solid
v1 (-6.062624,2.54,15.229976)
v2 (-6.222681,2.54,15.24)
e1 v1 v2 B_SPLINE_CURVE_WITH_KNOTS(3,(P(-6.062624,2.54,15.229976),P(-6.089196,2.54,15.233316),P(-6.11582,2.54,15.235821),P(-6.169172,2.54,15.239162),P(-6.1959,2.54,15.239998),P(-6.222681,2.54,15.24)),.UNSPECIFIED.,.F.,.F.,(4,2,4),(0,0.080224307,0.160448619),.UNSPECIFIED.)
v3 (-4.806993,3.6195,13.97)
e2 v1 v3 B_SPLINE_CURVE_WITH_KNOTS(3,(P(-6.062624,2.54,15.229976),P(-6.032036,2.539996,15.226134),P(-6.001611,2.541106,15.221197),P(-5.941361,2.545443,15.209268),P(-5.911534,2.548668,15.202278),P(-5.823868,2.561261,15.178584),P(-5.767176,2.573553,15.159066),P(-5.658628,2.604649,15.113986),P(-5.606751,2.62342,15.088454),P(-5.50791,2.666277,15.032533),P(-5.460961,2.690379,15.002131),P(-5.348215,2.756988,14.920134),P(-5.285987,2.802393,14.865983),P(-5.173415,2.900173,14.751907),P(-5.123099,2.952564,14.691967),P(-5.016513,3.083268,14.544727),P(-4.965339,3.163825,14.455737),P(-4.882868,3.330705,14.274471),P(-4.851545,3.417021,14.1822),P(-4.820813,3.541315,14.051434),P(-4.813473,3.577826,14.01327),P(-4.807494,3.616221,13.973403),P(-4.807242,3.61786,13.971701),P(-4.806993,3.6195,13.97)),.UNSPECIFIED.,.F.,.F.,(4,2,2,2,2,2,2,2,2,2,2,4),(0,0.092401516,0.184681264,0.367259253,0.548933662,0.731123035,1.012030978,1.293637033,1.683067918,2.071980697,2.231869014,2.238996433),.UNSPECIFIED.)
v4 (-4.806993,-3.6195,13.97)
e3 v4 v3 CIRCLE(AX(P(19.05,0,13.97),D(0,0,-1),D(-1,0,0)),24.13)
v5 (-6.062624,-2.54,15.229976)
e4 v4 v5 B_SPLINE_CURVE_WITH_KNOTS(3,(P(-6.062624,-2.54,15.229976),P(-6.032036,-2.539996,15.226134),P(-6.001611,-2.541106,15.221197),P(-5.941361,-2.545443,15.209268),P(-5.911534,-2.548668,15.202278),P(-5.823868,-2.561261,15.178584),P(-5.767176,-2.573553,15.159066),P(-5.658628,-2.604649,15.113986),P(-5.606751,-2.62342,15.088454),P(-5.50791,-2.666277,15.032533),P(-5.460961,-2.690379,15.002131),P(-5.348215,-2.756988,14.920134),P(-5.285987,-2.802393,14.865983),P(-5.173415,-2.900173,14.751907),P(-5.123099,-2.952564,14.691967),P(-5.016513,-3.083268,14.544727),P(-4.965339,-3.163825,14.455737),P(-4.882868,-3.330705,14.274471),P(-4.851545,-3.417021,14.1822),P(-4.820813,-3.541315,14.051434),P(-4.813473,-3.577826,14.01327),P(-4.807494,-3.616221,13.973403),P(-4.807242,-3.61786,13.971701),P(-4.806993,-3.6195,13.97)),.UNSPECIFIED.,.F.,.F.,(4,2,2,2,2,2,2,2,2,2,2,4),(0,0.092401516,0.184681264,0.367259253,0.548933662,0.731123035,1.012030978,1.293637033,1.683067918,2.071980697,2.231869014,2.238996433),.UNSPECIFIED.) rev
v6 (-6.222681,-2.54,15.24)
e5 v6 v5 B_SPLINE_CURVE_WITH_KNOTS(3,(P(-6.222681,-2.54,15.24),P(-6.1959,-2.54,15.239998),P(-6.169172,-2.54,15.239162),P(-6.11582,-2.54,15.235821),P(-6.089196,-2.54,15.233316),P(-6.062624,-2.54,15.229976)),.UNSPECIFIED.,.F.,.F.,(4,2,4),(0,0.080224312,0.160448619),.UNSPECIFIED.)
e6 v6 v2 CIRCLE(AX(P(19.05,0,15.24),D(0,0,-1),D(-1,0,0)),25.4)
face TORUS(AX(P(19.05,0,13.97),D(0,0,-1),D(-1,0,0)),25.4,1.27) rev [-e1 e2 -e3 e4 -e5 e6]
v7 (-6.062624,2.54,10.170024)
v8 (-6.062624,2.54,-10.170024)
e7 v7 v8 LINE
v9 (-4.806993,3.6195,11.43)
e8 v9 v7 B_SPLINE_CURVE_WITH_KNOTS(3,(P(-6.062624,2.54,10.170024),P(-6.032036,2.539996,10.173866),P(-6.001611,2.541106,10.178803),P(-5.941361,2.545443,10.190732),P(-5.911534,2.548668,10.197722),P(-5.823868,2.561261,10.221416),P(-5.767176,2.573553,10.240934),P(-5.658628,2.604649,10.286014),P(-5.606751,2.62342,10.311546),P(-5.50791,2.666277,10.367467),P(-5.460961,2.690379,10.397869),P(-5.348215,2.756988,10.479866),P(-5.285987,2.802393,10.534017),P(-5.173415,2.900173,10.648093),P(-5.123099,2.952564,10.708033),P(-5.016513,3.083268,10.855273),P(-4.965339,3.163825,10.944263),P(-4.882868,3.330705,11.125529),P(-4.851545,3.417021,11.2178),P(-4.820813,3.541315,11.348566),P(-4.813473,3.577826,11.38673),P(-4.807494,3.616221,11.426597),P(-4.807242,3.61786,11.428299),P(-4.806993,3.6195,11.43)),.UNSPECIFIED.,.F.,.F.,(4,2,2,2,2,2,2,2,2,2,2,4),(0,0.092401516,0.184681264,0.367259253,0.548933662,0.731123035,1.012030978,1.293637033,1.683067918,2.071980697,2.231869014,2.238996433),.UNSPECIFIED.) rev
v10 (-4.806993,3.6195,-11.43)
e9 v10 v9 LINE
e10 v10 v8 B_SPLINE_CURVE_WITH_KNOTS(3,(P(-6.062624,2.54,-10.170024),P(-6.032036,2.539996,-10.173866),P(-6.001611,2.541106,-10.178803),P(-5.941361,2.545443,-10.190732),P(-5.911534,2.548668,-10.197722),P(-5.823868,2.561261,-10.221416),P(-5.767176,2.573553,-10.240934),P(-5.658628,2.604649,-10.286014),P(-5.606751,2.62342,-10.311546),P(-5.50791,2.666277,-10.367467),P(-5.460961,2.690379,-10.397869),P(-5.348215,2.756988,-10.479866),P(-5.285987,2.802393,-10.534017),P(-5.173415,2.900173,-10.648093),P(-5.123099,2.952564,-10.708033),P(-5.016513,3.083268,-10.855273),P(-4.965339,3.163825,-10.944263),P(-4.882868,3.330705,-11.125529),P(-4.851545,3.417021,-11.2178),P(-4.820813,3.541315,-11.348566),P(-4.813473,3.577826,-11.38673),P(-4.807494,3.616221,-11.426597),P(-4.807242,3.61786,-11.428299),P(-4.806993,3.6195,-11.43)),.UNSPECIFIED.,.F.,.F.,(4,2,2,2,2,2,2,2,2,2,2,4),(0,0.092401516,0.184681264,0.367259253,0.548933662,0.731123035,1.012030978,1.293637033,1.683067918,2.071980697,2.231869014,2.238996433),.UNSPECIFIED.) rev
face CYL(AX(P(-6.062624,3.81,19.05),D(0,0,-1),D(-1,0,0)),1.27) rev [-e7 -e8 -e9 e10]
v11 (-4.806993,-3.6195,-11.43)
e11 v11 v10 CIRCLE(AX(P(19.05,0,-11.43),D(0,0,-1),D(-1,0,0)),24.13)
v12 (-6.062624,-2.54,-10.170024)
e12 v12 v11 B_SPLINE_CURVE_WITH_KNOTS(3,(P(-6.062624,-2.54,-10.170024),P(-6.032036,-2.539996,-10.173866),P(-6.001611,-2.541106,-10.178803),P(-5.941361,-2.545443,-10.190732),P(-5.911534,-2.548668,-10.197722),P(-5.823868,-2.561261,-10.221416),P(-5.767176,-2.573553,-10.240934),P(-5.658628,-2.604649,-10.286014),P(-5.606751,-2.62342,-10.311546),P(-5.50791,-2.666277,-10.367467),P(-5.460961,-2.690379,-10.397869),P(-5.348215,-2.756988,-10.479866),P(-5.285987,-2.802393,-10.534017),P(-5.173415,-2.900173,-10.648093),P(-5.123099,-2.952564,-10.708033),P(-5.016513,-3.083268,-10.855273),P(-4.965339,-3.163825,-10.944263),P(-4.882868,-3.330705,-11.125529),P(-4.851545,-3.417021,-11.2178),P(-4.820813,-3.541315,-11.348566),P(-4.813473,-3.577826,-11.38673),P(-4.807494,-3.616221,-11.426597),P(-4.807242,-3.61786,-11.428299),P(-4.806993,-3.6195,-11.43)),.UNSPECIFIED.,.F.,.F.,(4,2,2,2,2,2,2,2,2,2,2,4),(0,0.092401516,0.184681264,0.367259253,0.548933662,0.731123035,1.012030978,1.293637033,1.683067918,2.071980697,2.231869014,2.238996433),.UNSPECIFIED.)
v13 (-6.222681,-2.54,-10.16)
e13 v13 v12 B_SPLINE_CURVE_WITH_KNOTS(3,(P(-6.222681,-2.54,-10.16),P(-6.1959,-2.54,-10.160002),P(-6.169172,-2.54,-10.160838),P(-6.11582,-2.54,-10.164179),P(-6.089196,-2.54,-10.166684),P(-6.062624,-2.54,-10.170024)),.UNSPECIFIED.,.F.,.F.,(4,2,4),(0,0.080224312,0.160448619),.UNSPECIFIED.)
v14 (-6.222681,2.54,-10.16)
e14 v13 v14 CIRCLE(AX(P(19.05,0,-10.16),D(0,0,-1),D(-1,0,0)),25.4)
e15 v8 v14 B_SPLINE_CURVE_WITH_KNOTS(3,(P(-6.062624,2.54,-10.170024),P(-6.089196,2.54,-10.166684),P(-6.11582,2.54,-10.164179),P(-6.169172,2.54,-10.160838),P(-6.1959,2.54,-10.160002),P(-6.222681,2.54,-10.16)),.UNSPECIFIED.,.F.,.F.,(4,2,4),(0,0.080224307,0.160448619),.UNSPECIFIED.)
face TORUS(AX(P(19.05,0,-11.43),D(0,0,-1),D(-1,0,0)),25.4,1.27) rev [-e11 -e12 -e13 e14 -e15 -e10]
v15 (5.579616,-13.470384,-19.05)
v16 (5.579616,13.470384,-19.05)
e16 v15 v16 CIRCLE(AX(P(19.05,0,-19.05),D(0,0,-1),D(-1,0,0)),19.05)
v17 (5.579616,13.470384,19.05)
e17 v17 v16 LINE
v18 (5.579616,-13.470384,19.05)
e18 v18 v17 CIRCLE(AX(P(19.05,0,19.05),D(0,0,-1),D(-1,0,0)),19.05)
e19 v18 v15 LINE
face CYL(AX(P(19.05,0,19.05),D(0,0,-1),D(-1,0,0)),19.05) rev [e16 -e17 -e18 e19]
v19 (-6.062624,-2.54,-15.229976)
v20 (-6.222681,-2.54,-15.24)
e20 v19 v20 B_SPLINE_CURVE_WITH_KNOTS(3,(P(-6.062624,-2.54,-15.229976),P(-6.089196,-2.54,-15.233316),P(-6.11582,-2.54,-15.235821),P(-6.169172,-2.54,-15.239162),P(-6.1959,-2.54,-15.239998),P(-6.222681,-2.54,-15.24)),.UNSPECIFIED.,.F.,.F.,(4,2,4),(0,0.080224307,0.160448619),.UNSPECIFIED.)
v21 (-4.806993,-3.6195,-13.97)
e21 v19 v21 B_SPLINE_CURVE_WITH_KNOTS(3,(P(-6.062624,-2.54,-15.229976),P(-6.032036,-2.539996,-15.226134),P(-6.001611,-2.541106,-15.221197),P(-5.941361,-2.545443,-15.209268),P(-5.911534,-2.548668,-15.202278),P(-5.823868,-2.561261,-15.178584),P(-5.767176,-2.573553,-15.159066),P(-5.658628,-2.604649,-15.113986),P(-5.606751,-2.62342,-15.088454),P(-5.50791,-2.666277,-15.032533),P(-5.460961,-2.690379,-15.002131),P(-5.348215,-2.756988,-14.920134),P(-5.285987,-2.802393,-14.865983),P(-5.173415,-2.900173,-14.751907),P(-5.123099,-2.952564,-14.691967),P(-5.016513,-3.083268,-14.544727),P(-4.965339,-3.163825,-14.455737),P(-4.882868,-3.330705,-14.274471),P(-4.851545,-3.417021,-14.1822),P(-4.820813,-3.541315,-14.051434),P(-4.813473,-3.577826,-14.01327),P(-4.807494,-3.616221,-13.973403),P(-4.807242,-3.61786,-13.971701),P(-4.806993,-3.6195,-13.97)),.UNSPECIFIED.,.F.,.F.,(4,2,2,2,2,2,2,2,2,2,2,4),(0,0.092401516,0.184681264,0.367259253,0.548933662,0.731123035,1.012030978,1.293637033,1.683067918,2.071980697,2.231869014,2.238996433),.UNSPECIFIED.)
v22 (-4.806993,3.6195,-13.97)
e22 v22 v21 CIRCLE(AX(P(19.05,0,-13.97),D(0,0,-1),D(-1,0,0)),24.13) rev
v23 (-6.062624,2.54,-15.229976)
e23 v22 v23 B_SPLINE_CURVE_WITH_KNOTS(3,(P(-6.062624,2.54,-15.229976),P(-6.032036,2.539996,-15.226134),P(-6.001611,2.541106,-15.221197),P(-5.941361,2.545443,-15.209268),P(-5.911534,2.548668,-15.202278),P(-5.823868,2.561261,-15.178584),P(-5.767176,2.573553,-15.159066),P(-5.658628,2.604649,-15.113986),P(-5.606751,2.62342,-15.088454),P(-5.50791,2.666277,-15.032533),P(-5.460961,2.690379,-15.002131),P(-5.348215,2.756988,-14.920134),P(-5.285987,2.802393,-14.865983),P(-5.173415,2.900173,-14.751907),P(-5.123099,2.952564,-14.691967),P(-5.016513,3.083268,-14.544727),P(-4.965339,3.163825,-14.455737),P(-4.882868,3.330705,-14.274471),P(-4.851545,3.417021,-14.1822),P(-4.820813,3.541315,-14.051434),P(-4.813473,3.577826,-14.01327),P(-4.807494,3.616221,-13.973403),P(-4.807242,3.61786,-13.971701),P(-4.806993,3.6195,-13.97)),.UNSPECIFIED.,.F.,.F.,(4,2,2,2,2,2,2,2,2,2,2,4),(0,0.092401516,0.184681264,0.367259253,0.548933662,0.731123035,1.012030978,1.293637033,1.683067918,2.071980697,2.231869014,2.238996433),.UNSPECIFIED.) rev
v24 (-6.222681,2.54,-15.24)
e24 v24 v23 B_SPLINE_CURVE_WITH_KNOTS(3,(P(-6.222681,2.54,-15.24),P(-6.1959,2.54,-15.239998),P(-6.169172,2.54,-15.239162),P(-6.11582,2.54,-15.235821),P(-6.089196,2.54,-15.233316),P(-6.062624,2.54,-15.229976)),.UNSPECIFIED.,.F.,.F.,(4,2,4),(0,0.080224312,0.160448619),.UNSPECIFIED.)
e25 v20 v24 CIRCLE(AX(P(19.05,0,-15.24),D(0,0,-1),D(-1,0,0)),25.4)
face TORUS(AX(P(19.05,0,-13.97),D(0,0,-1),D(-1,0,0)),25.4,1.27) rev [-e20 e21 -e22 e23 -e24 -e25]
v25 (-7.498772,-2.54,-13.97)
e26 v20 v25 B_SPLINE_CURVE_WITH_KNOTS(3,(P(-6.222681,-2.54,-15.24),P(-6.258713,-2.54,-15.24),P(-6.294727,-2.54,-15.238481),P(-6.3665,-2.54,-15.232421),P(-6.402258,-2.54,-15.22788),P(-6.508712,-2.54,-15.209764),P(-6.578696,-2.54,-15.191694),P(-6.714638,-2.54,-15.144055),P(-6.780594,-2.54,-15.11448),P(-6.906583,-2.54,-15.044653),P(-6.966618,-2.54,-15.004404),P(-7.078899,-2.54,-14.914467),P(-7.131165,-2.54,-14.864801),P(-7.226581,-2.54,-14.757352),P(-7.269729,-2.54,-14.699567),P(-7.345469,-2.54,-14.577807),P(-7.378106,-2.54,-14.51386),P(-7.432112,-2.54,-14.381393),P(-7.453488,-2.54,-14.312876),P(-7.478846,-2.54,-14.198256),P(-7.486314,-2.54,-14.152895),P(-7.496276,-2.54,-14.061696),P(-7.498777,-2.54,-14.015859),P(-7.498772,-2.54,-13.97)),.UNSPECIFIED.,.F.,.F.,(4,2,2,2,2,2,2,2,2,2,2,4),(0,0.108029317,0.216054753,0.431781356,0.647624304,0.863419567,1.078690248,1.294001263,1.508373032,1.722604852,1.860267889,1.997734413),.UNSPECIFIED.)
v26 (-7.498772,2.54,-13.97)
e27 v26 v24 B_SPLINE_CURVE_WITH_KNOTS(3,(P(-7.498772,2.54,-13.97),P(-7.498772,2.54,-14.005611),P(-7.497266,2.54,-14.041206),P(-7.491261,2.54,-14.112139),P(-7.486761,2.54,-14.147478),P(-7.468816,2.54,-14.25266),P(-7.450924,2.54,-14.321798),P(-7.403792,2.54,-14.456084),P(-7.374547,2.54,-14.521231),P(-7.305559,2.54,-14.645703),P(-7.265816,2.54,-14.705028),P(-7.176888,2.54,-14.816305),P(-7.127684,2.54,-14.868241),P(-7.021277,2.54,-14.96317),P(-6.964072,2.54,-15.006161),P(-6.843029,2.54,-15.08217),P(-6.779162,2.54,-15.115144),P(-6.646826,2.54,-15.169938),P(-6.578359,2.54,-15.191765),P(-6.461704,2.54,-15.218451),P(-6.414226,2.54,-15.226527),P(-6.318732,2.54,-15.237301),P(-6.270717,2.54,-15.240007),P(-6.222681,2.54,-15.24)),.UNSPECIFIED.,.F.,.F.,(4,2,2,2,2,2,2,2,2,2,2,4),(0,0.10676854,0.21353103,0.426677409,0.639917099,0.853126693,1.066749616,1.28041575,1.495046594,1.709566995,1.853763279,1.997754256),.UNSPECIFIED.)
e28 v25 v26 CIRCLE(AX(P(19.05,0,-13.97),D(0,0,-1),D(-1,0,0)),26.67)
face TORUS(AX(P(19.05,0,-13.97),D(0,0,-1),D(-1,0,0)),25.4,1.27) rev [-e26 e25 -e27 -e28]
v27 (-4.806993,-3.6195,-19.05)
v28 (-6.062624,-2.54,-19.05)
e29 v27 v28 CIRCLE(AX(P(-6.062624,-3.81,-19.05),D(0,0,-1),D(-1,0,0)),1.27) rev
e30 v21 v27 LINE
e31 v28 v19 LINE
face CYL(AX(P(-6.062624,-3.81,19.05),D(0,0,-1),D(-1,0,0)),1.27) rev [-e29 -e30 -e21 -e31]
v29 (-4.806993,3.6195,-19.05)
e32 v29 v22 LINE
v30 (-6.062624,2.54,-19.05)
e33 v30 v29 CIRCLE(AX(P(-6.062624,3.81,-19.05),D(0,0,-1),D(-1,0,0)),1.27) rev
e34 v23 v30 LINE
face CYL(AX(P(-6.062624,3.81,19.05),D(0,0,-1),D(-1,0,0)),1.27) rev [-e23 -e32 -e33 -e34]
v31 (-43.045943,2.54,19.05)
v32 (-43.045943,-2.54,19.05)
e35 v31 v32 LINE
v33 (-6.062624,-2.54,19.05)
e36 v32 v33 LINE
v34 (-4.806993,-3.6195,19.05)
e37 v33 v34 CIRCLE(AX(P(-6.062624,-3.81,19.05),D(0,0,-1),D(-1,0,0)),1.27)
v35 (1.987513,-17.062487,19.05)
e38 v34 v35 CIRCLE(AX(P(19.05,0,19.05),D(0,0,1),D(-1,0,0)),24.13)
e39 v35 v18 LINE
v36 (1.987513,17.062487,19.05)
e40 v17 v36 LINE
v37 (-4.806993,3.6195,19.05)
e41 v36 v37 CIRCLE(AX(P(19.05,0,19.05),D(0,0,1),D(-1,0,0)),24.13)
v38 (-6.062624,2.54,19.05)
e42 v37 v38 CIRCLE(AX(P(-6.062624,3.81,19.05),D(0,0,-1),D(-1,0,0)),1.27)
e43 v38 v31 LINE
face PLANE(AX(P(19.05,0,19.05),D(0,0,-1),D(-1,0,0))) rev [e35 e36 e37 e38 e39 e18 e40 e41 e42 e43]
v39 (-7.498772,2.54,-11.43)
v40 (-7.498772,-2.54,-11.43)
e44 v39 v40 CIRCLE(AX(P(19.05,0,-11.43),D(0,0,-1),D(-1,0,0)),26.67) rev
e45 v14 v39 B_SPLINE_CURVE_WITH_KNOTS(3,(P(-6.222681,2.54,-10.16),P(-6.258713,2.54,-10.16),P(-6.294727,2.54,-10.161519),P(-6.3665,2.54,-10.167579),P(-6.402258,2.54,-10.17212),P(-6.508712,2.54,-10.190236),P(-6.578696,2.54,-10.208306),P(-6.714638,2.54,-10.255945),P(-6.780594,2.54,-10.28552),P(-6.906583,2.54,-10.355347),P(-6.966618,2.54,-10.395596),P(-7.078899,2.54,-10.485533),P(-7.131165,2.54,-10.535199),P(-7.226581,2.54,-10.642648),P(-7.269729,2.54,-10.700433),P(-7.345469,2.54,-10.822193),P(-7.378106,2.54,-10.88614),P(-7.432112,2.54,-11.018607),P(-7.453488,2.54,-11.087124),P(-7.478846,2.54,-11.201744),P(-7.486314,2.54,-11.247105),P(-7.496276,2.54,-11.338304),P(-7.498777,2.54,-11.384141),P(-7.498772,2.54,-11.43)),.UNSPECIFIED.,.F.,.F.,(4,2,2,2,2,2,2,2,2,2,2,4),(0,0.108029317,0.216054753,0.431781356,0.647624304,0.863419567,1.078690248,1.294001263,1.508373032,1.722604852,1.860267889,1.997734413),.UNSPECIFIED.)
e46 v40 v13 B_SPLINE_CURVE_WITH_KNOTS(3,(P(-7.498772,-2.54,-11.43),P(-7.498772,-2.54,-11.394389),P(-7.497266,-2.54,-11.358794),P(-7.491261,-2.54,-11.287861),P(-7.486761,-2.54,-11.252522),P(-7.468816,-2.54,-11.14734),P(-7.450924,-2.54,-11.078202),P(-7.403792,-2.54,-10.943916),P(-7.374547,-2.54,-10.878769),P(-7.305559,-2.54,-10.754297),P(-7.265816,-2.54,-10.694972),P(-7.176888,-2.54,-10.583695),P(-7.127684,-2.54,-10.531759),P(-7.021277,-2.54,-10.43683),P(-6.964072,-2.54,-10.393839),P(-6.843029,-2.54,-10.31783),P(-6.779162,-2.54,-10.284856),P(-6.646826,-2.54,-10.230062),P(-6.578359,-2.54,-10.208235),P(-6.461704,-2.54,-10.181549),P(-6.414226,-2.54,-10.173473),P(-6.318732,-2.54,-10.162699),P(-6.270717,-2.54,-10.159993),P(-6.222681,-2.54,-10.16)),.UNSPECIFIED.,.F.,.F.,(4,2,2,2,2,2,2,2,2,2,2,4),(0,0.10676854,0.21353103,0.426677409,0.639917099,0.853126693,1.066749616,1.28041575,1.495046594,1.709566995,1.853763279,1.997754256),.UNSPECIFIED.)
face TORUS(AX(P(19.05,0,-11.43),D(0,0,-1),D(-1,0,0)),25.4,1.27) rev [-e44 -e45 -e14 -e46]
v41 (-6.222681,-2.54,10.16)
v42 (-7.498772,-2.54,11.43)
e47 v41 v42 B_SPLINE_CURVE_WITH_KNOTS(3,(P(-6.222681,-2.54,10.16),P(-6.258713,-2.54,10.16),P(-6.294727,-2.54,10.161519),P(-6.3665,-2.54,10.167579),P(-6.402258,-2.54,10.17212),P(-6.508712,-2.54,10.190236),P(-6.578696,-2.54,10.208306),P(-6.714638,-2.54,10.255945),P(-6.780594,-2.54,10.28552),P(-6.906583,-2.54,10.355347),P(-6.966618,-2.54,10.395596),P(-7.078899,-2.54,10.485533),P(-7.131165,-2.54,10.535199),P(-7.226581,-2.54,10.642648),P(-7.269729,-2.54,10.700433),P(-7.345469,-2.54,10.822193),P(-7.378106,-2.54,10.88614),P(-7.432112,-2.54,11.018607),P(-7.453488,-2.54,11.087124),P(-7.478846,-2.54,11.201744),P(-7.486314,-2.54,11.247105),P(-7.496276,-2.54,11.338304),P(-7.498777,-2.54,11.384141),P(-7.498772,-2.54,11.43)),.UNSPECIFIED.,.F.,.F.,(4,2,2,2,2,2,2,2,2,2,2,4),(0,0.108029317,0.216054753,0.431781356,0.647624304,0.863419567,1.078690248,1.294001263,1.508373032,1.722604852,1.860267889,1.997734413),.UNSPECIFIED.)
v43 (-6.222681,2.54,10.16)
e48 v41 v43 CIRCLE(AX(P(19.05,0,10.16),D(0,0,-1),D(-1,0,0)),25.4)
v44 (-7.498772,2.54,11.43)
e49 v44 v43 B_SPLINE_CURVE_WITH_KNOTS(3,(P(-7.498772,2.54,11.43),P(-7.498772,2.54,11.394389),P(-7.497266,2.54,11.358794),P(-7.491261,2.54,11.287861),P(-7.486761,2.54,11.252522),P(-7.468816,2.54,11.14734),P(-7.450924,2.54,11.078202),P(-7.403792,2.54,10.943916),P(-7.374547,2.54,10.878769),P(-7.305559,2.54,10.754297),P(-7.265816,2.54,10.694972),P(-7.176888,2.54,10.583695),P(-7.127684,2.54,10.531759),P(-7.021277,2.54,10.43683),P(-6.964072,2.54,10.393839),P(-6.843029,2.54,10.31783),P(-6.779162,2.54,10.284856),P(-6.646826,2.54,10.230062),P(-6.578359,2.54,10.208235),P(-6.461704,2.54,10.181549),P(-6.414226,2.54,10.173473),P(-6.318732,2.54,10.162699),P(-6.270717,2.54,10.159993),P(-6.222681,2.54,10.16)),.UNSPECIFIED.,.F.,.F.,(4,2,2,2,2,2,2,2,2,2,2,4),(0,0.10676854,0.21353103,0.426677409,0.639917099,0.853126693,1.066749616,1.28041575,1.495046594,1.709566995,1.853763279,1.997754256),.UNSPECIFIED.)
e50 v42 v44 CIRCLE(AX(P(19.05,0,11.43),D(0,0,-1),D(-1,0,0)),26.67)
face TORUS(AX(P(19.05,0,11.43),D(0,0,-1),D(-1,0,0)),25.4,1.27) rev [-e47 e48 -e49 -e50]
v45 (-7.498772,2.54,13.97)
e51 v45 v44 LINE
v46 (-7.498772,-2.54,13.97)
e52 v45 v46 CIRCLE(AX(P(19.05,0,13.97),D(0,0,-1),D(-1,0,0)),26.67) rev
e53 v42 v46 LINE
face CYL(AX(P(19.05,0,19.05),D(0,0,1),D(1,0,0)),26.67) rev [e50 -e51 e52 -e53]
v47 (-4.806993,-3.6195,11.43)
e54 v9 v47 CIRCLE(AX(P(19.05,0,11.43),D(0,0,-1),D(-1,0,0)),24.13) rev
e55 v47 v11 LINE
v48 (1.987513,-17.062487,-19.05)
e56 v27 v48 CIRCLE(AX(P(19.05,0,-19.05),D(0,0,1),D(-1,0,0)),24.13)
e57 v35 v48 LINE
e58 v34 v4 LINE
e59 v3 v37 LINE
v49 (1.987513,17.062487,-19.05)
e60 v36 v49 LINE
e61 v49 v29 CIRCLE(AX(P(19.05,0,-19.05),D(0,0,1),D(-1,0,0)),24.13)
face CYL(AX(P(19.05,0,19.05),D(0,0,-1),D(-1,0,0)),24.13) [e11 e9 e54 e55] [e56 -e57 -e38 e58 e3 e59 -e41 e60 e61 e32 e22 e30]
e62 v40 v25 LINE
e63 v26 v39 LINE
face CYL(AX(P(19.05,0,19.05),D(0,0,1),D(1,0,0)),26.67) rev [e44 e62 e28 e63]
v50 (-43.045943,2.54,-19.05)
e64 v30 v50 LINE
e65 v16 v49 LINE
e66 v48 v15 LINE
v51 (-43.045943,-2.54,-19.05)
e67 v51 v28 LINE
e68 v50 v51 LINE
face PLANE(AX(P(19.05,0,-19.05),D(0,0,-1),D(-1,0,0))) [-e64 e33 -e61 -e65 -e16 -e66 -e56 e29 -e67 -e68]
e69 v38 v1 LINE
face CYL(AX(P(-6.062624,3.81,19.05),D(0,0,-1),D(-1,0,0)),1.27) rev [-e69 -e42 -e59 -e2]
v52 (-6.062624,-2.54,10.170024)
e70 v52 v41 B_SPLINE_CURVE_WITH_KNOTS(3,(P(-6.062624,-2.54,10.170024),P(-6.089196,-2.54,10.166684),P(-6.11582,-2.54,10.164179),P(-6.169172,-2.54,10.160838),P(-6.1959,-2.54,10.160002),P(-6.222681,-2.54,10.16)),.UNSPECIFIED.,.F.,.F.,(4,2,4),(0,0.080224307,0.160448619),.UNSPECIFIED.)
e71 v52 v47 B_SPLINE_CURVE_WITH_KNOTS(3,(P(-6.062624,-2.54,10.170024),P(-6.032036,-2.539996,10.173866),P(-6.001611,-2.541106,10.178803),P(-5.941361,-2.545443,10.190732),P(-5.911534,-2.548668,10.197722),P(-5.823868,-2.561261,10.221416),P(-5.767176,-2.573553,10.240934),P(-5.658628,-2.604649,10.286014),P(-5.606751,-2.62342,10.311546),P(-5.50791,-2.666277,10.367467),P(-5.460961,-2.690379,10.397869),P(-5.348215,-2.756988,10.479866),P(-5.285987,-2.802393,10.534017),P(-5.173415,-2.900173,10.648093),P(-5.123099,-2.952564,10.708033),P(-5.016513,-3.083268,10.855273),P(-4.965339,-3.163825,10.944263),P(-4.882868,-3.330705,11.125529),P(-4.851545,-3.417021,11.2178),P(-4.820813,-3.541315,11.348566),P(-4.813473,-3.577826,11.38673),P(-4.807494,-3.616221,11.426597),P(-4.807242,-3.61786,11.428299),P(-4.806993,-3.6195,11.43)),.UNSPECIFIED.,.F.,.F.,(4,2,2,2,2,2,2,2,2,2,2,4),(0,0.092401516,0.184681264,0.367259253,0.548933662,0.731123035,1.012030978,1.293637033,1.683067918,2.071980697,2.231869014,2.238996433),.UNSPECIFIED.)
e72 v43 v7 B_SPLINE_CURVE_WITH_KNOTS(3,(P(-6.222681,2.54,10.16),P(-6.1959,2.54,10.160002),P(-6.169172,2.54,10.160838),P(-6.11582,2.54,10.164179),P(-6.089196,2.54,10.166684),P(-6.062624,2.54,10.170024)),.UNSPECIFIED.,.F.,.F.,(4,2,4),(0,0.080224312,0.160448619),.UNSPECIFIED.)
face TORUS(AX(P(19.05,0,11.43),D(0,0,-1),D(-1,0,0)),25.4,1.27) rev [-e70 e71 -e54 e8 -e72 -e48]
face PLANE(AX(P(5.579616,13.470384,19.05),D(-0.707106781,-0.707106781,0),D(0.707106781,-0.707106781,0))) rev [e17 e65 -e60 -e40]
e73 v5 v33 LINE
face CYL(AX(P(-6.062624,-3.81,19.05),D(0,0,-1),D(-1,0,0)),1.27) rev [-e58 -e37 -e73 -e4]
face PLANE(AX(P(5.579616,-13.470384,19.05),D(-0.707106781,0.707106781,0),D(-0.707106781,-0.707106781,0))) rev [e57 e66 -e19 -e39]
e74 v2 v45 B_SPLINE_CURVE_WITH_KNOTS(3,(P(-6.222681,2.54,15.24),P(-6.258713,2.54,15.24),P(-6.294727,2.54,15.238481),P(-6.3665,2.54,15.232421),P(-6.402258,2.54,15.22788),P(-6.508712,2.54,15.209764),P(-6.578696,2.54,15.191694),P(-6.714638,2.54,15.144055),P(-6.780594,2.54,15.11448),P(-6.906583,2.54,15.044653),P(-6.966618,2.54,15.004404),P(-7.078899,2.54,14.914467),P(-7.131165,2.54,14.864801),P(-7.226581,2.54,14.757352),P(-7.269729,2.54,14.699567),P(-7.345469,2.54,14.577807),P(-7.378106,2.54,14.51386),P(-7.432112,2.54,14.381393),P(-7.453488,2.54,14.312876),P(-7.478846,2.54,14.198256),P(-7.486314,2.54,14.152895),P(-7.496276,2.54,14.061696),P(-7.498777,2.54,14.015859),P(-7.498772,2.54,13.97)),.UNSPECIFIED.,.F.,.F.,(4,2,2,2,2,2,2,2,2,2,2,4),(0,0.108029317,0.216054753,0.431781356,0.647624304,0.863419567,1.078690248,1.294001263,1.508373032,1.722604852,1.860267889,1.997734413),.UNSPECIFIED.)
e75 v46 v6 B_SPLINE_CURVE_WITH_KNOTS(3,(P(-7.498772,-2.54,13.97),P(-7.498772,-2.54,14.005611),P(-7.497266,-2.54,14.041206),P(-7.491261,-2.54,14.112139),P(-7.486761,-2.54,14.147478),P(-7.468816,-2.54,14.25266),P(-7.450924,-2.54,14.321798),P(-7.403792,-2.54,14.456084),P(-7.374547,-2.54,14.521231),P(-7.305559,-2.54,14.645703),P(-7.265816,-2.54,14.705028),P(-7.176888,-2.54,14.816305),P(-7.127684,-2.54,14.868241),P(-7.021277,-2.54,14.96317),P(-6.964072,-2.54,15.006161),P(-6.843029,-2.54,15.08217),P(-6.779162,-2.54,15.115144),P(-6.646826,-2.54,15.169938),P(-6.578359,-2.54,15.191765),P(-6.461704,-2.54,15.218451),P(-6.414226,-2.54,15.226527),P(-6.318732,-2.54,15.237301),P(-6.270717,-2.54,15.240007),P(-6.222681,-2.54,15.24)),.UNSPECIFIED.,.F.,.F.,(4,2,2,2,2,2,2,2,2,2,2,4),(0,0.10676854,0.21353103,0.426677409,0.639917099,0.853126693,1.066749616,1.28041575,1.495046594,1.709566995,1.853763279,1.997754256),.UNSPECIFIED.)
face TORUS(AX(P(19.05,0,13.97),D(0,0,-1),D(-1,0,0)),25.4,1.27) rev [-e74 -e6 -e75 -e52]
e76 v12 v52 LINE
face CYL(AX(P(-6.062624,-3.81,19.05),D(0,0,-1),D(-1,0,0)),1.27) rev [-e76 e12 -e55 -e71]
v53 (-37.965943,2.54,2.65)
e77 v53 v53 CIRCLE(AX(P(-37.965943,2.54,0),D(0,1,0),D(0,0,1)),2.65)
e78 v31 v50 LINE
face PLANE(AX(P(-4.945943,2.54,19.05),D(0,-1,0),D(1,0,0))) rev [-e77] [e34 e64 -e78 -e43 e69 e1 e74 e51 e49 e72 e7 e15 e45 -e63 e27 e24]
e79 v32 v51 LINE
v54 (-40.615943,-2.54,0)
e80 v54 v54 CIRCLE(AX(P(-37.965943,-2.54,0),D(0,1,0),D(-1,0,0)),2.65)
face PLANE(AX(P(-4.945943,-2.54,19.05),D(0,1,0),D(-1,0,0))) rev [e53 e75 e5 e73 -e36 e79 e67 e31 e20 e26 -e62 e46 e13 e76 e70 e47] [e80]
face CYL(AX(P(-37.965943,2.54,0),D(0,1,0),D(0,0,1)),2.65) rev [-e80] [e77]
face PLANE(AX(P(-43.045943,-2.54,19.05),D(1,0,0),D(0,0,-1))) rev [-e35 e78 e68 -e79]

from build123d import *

# Parameters (mm, degrees)
BOSS_EXTRUDE1_DEPTH  = 19.05
M5_CLEARANCE_HOLE1_D = 5.3
FILLET1_R            = 1.27


with BuildPart() as part:
    # Sketch1 → Boss-Extrude1 (new, symmetric)
    with BuildSketch(Plane.XY):
        with BuildLine():
            Line((5.57961581839625, -13.470384181603707), (1.987513369968585, -17.06248663003137))
            ThreePointArc((1.987513369968585, -17.06248663003137), (-2.725544166788481, -10.39627703749012), (-4.945943407167808, -2.539999999999996))
            Line((-4.945943407167808, -2.539999999999996), (-43.04594340716781, -2.540000000000002))
            Line((-43.04594340716781, -2.540000000000002), (-43.04594340716781, 2.5399999999999987))
            Line((-43.04594340716781, 2.5399999999999987), (-4.945943407167809, 2.5399999999999956))
            ThreePointArc((-4.945943407167809, 2.5399999999999956), (-2.7255441667884845, 10.39627703749011), (1.9875133699685803, 17.062486630031362))
            Line((1.9875133699685803, 17.062486630031362), (5.57961581839625, 13.470384181603707))
            ThreePointArc((5.57961581839625, 13.470384181603707), (0, -2.33e-15), (5.57961581839625, -13.470384181603707))
        make_face()
    extrude(amount=BOSS_EXTRUDE1_DEPTH, both=True)

    # Sketch3 → Cut-Revolve1 (revolve, cut)
    with BuildSketch(Plane(origin=(0, 0, 0), x_dir=(1, 0, 0), z_dir=(0, 1, 0))):
        Polygon((-5.080000000000001, 15.239999999999998), (-5.079999999999999, 10.159999999999997), (-7.619999999999999, 10.159999999999995), (-7.620000000000001, 15.239999999999998), align=None)
        Polygon((-7.6200000000000045, -15.239999999999998), (-7.620000000000003, -10.159999999999995), (-5.080000000000003, -10.159999999999997), (-5.0800000000000045, -15.239999999999998), align=None)
    revolve(axis=Axis((19.049999999999997, 0, 19.05), (0, 0, -1)), mode=Mode.SUBTRACT)

    # M5 Clearance Hole1 (through all)
    with Locations(Plane(origin=(2.3e-16, 2.539999999999995, 0), x_dir=(1, -1.3e-15, 0), z_dir=(1.3e-15, 1, 0))):
        with Locations((-37.965943407, 0)):
            Hole(M5_CLEARANCE_HOLE1_D / 2)

    # Fillet1
    # the kernel refuses this fillet: 1.27 mm, written as the material it adds along each edge
    with BuildSketch(Plane(origin=(19.049999999999997, 0, 10.159999999999995), x_dir=(-0.977097634311174, 0.21279147779811838, 0), z_dir=(0.21279147779811838, 0.977097634311174, 0))) as fillet1_piece_1_section:
        with BuildLine():
            CenterArc((26.669999999999998 - FILLET1_R, FILLET1_R), FILLET1_R, 270, 90)
            Line((26.669999999999998, FILLET1_R), (26.669999999999998, 0))
            Line((26.669999999999998, 0), (26.669999999999998 - FILLET1_R, 0))
        make_face()
    fillet1_piece_1 = revolve(axis=Axis((19.049999999999997, 0, 10.159999999999995), (0, 0, 1)), revolution_arc=24.571980666955447, mode=Mode.PRIVATE)
    fillet1_piece_1 = split(fillet1_piece_1, bisect_by=Plane(origin=(-7.291599900953605, -2.5399999999999965, 10.447516445841947), z_dir=(-1.5e-16, 1, 0)), keep=Keep.TOP, mode=Mode.PRIVATE)
    fillet1_piece_1 = split(fillet1_piece_1, bisect_by=Plane(origin=(-7.2915999009536066, 2.5399999999999956, 10.447516445841947), z_dir=(-8e-17, -1, 0)), keep=Keep.TOP, mode=Mode.PRIVATE)
    add(fillet1_piece_1)
    with BuildSketch(Plane(origin=(19.049999999999997, 0, 10.159999999999997), x_dir=(-0.97203785589273, -0.23482420384505578, 0), z_dir=(0.23482420384505578, -0.97203785589273, 0))) as fillet1_piece_2_section:
        with BuildLine():
            CenterArc((24.130000000000003 + FILLET1_R, -FILLET1_R), FILLET1_R, 90, 90)
            Line((24.130000000000003 + FILLET1_R, 1.78e-15), (24.130000000000003, 1.78e-15))
            Line((24.130000000000003, 1.78e-15), (24.130000000000003, -FILLET1_R))
        make_face()
    fillet1_piece_2 = revolve(axis=Axis((19.049999999999997, 0, 10.159999999999997), (0, 0, -1)), revolution_arc=13.581260422554433, mode=Mode.PRIVATE)
    fillet1_piece_2 = split(fillet1_piece_2, bisect_by=Plane(origin=(-5.323332867248744, -2.539999999999996, 10.44752827133116), z_dir=(-1.5e-16, 1, 0)), keep=Keep.TOP, mode=Mode.PRIVATE)
    add(fillet1_piece_2)
    with BuildSketch(Plane(origin=(19.049999999999997, 0, 15.239999999999998), x_dir=(-1, 0, 0), z_dir=(0, -1, 0))) as fillet1_piece_3_section:
        with BuildLine():
            CenterArc((24.130000000000003 + FILLET1_R, FILLET1_R), FILLET1_R, 180, 90.00000000000017)
            Line((24.130000000000003 + FILLET1_R, 0), (24.130000000000003, 0))
            Line((24.130000000000003, 0), (24.13, FILLET1_R))
        make_face()
    fillet1_piece_3 = revolve(axis=Axis((19.049999999999997, 0, 15.239999999999998), (0, 0, -1)), revolution_arc=13.581260422554424, mode=Mode.PRIVATE)
    fillet1_piece_3 = split(fillet1_piece_3, bisect_by=Plane(origin=(-5.3233331057064674, 2.5399999999999956, 14.952471726792393), z_dir=(-8e-17, -1, 0)), keep=Keep.TOP, mode=Mode.PRIVATE)
    add(fillet1_piece_3)
    with BuildSketch(Plane(origin=(19.049999999999997, 0, 15.239999999999998), x_dir=(-0.977097634311174, 0.21279147779811838, 0), z_dir=(0.21279147779811838, 0.977097634311174, 0))) as fillet1_piece_4_section:
        with BuildLine():
            CenterArc((26.669999999999998 - FILLET1_R, -FILLET1_R), FILLET1_R, 0, 90)
            Line((26.669999999999998, -FILLET1_R), (26.669999999999998, 0))
            Line((26.669999999999998, 0), (26.669999999999998 - FILLET1_R, 0))
        make_face()
    fillet1_piece_4 = revolve(axis=Axis((19.049999999999997, 0, 15.239999999999998), (0, 0, 1)), revolution_arc=24.571980666955447, mode=Mode.PRIVATE)
    fillet1_piece_4 = split(fillet1_piece_4, bisect_by=Plane(origin=(-7.2915999009536066, -2.5399999999999965, 14.952483554158047), z_dir=(-1.5e-16, 1, 0)), keep=Keep.TOP, mode=Mode.PRIVATE)
    fillet1_piece_4 = split(fillet1_piece_4, bisect_by=Plane(origin=(-7.2915999009536066, 2.5399999999999956, 14.952483554158047), z_dir=(-8e-17, -1, 0)), keep=Keep.TOP, mode=Mode.PRIVATE)
    add(fillet1_piece_4)
    with BuildSketch(Plane(origin=(19.049999999999997, 0, -10.159999999999997), x_dir=(-0.9720378558927297, -0.23482420384505664, 0), z_dir=(0.23482420384505664, -0.9720378558927297, 0))) as fillet1_piece_5_section:
        with BuildLine():
            CenterArc((24.129999999999995 + FILLET1_R, FILLET1_R), FILLET1_R, 180, 90)
            Line((24.129999999999995 + FILLET1_R, 0), (24.129999999999995, 0))
            Line((24.129999999999995, 0), (24.129999999999995, FILLET1_R))
        make_face()
    fillet1_piece_5 = revolve(axis=Axis((19.049999999999997, 0, -10.159999999999997), (0, 0, -1)), revolution_arc=13.581260422554445, mode=Mode.PRIVATE)
    fillet1_piece_5 = split(fillet1_piece_5, bisect_by=Plane(origin=(-5.32333286724874, -2.539999999999996, -10.447528271331164), z_dir=(-1.5e-16, 1, 0)), keep=Keep.TOP, mode=Mode.PRIVATE)
    add(fillet1_piece_5)
    with BuildSketch(Plane(origin=(19.049999999999997, 0, -10.159999999999993), x_dir=(-0.9770976343111741, 0.2127914777981185, 0), z_dir=(0.2127914777981185, 0.9770976343111741, 0))) as fillet1_piece_6_section:
        with BuildLine():
            CenterArc((26.669999999999995 - FILLET1_R, -FILLET1_R), FILLET1_R, 0, 90)
            Line((26.669999999999995 - FILLET1_R, -3.55e-15), (26.669999999999995, -3.55e-15))
            Line((26.669999999999995, -3.55e-15), (26.669999999999995, -FILLET1_R))
        make_face()
    fillet1_piece_6 = revolve(axis=Axis((19.049999999999997, 0, -10.159999999999993), (0, 0, 1)), revolution_arc=24.571980666955454, mode=Mode.PRIVATE)
    fillet1_piece_6 = split(fillet1_piece_6, bisect_by=Plane(origin=(-7.291599896838221, -2.5399999999999965, -10.447516449246772), z_dir=(-1.5e-16, 1, 0)), keep=Keep.TOP, mode=Mode.PRIVATE)
    fillet1_piece_6 = split(fillet1_piece_6, bisect_by=Plane(origin=(-7.291599896838221, 2.5399999999999956, -10.447516449246772), z_dir=(-8e-17, -1, 0)), keep=Keep.TOP, mode=Mode.PRIVATE)
    add(fillet1_piece_6)
    with BuildSketch(Plane(origin=(19.049999999999997, 0, -15.239999999999998), x_dir=(-0.9770976343111741, 0.21279147779811852, 0), z_dir=(0.21279147779811852, 0.9770976343111741, 0))) as fillet1_piece_7_section:
        with BuildLine():
            CenterArc((26.669999999999995 - FILLET1_R, FILLET1_R), FILLET1_R, 270, 90)
            Line((26.669999999999995, FILLET1_R), (26.669999999999995, 0))
            Line((26.669999999999995, 0), (26.669999999999995 - FILLET1_R, 0))
        make_face()
    fillet1_piece_7 = revolve(axis=Axis((19.049999999999997, 0, -15.239999999999998), (0, 0, 1)), revolution_arc=24.57198066695545, mode=Mode.PRIVATE)
    fillet1_piece_7 = split(fillet1_piece_7, bisect_by=Plane(origin=(-7.291599900953608, -2.5399999999999965, -14.952483554158045), z_dir=(-1.5e-16, 1, 0)), keep=Keep.TOP, mode=Mode.PRIVATE)
    fillet1_piece_7 = split(fillet1_piece_7, bisect_by=Plane(origin=(-7.2915999009536066, 2.5399999999999956, -14.952483554158045), z_dir=(-8e-17, -1, 0)), keep=Keep.TOP, mode=Mode.PRIVATE)
    add(fillet1_piece_7)
    with BuildSketch(Plane(origin=(19.049999999999997, 0, -15.239999999999998), x_dir=(-1, 0, 0), z_dir=(0, -1, 0))) as fillet1_piece_8_section:
        with BuildLine():
            CenterArc((24.13 + FILLET1_R, -FILLET1_R), FILLET1_R, 90, 90)
            Line((24.13 + FILLET1_R, 0), (24.13, 0))
            Line((24.13, 0), (24.13, -FILLET1_R))
        make_face()
    fillet1_piece_8 = revolve(axis=Axis((19.049999999999997, 0, -15.239999999999998), (0, 0, -1)), revolution_arc=13.581260422554415, mode=Mode.PRIVATE)
    fillet1_piece_8 = split(fillet1_piece_8, bisect_by=Plane(origin=(-5.3233331057064674, 2.5399999999999956, -14.952471726792393), z_dir=(-8e-17, -1, 0)), keep=Keep.TOP, mode=Mode.PRIVATE)
    add(fillet1_piece_8)
    with BuildSketch(Plane(origin=(-4.945943407167807, -2.539999999999996, 10.159999999999997), x_dir=(0.12766405034714182, -0.9918174682112442, 0), z_dir=(0, 0, -1))) as fillet1_piece_9:
        with BuildLine():
            CenterArc((1.1170481769540845, 1.2696769750168004), FILLET1_R, 187.33462748878583, 81.3730734414022)
            Line((-0.1425600076744228, 1.107543631077695), (0, 0))
            ThreePointArc((0, 0), (0.5442029580032722, 0.00613747468079426), (1.088405916006544, -2e-17))
        make_face()
    extrude(amount=20.319999999999993)
    with BuildSketch(Plane(origin=(-4.945943407167807, -2.539999999999996, 19.05), x_dir=(0.12766405034714182, -0.9918174682112442, 0), z_dir=(0, 0, -1)), Plane(origin=(-4.945943407167807, -2.539999999999996, -15.239999999999998), x_dir=(0.12766405034714182, -0.9918174682112442, 0), z_dir=(0, 0, -1))) as fillet1_piece_10:
        with BuildLine():
            CenterArc((1.1170481769540845, 1.2696769750168004), FILLET1_R, 187.33462748878583, 81.3730734414022)
            Line((-0.1425600076744228, 1.107543631077695), (0, 0))
            ThreePointArc((0, 0), (0.5442029580032722, 0.00613747468079426), (1.088405916006544, -2e-17))
        make_face()
    extrude(amount=3.8100000000000023)
    with BuildSketch(Plane(origin=(-4.9459434071678094, 2.5399999999999956, -15.239999999999998), x_dir=(-1, 0, 0), z_dir=(0, 0, -1)), Plane(origin=(-4.9459434071678094, 2.5399999999999956, 19.05), x_dir=(-1, 0, 0), z_dir=(0, 0, -1))) as fillet1_piece_11:
        with BuildLine():
            CenterArc((1.1166809081061766, 1.27), FILLET1_R, 188.62692655867798, 81.37307344132205)
            ThreePointArc((-0.138950307657435, 1.0795000000000146), (-0.06338789923048704, 0.5405335348765443), (0, 0))
            Line((0, 0), (1.1166809081061766, 0))
        make_face()
    extrude(amount=3.8100000000000023)
    with BuildSketch(Plane(origin=(-4.9459434071678094, 2.5399999999999956, 10.159999999999997), x_dir=(-1, 0, 0), z_dir=(0, 0, -1))) as fillet1_piece_12:
        with BuildLine():
            CenterArc((1.1166809081061766, 1.27), FILLET1_R, 188.62692655867798, 81.37307344132205)
            ThreePointArc((-0.138950307657435, 1.0795000000000146), (-0.06338789923048704, 0.5405335348765443), (0, 0))
            Line((0, 0), (1.1166809081061766, 0))
        make_face()
    extrude(amount=20.319999999999993)
    with BuildSketch(Plane(origin=(19.049999999999997, 0, -15.239999999999998), x_dir=(-0.97203785589273, -0.23482420384505578, 0), z_dir=(0.23482420384505578, -0.97203785589273, 0))) as fillet1_piece_13_section:
        with BuildLine():
            CenterArc((24.130000000000003 + FILLET1_R, -FILLET1_R), FILLET1_R, 90, 90)
            Line((24.130000000000003 + FILLET1_R, 0), (24.130000000000003, 0))
            Line((24.130000000000003, 0), (24.130000000000003, -FILLET1_R))
        make_face()
    fillet1_piece_13 = revolve(axis=Axis((19.049999999999997, 0, -15.239999999999998), (0, 0, -1)), revolution_arc=13.581260422554433, mode=Mode.PRIVATE)
    fillet1_piece_13 = split(fillet1_piece_13, bisect_by=Plane(origin=(-5.323332867248744, -2.539999999999996, -14.952471728668833), z_dir=(-1.5e-16, 1, 0)), keep=Keep.TOP, mode=Mode.PRIVATE)
    add(fillet1_piece_13)
    with BuildSketch(Plane(origin=(19.049999999999997, 0, -10.159999999999997), x_dir=(-1, 0, 0), z_dir=(0, -1, 0))) as fillet1_piece_14_section:
        with BuildLine():
            CenterArc((24.129999999999995 + FILLET1_R, FILLET1_R), FILLET1_R, 180, 89.99999999999983)
            Line((24.129999999999995 + FILLET1_R, 0), (24.129999999999995, 0))
            Line((24.129999999999995, 0), (24.13, FILLET1_R))
        make_face()
    fillet1_piece_14 = revolve(axis=Axis((19.049999999999997, 0, -10.159999999999997), (0, 0, -1)), revolution_arc=13.581260422554427, mode=Mode.PRIVATE)
    fillet1_piece_14 = split(fillet1_piece_14, bisect_by=Plane(origin=(-5.32333310570646, 2.5399999999999956, -10.447528273207606), z_dir=(-8e-17, -1, 0)), keep=Keep.TOP, mode=Mode.PRIVATE)
    add(fillet1_piece_14)
    with BuildSketch(Plane(origin=(19.049999999999997, 0, 15.239999999999998), x_dir=(-0.9720378558927298, -0.23482420384505664, 0), z_dir=(0.23482420384505664, -0.9720378558927298, 0))) as fillet1_piece_15_section:
        with BuildLine():
            CenterArc((24.130000000000003 + FILLET1_R, FILLET1_R), FILLET1_R, 180, 90)
            Line((24.130000000000003 + FILLET1_R, 0), (24.130000000000003, 0))
            Line((24.130000000000003, 0), (24.130000000000003, FILLET1_R))
        make_face()
    fillet1_piece_15 = revolve(axis=Axis((19.049999999999997, 0, 15.239999999999998), (0, 0, -1)), revolution_arc=13.581260422554445, mode=Mode.PRIVATE)
    fillet1_piece_15 = split(fillet1_piece_15, bisect_by=Plane(origin=(-5.323332867248749, -2.539999999999996, 14.952471728668836), z_dir=(-1.5e-16, 1, 0)), keep=Keep.TOP, mode=Mode.PRIVATE)
    add(fillet1_piece_15)
    with BuildSketch(Plane(origin=(19.049999999999997, 0, 10.159999999999997), x_dir=(-1, 0, 0), z_dir=(0, -1, 0))) as fillet1_piece_16_section:
        with BuildLine():
            CenterArc((24.13 + FILLET1_R, -FILLET1_R), FILLET1_R, 90, 90)
            Line((24.13 + FILLET1_R, 0), (24.13, 0))
            Line((24.13, 0), (24.13, -FILLET1_R))
        make_face()
    fillet1_piece_16 = revolve(axis=Axis((19.049999999999997, 0, 10.159999999999997), (0, 0, -1)), revolution_arc=13.581260422554415, mode=Mode.PRIVATE)
    fillet1_piece_16 = split(fillet1_piece_16, bisect_by=Plane(origin=(-5.3233331057064674, 2.5399999999999956, 10.447528273207606), z_dir=(-8e-17, -1, 0)), keep=Keep.TOP, mode=Mode.PRIVATE)
    add(fillet1_piece_16)
    with BuildSketch(Plane(origin=(-4.945943407167807, -2.539999999999996, 12.951702270265507), x_dir=(0.12766405034714182, -0.9918174682112442, 0), z_dir=(0, 0, -1))) as fillet1_piece_17a_section:
        with BuildLine():
            CenterArc((1.1170481769540845, 1.2696769750168004), FILLET1_R, 187.33462748878583, 81.3730734414022)
            Line((-0.1425600076744228, 1.107543631077695), (0, 0))
            ThreePointArc((0, 0), (0.5442029580032722, 0.00613747468079426), (1.088405916006544, -2e-17))
        make_face()
    fillet1_piece_17a = extrude(amount=23.111702270265504, mode=Mode.PRIVATE)
    fillet1_piece_17a = split(fillet1_piece_17a, bisect_by=Plane(origin=(-5.169208228517128, -2.781117736430252, 10.159999999999995), z_dir=(0, 0, 1)), keep=Keep.TOP, mode=Mode.PRIVATE)
    with BuildSketch(Plane(origin=(19.049999999999997, 0, 10.159999999999997), x_dir=(-0.97203785589273, -0.23482420384505578, 0), z_dir=(0.23482420384505578, -0.97203785589273, 0))) as fillet1_piece_17b_section:
        with BuildLine():
            CenterArc((24.130000000000003 + FILLET1_R, -FILLET1_R), FILLET1_R, 90, 90)
            Line((24.130000000000003 + FILLET1_R, 1.78e-15), (24.130000000000003, 1.78e-15))
            Line((24.130000000000003, 1.78e-15), (24.130000000000003, -FILLET1_R))
        make_face()
    fillet1_piece_17b = revolve(axis=Axis((19.049999999999997, 0, 10.159999999999997), (0, 0, -1)), revolution_arc=13.581260422554433, mode=Mode.PRIVATE)
    fillet1_piece_17b = split(fillet1_piece_17b, bisect_by=Plane(origin=(-5.000706985946909, -2.539999999999996, 10.444279944253609), z_dir=(1.5e-16, -1, 0)), keep=Keep.TOP, mode=Mode.PRIVATE)
    fillet1_piece_17 = fillet1_piece_17a & fillet1_piece_17b
    add(fillet1_piece_17)
    with BuildSketch(Plane(origin=(-4.9459434071678094, 2.5399999999999956, 19.05), x_dir=(-1, 0, 0), z_dir=(0, 0, -1))) as fillet1_piece_18a_section:
        with BuildLine():
            CenterArc((1.1166809081061766, 1.27), FILLET1_R, 188.62692655867798, 81.37307344132205)
            ThreePointArc((-0.138950307657435, 1.0795000000000146), (-0.06338789923048704, 0.5405335348765443), (0, 0))
            Line((0, 0), (1.1166809081061766, 0))
        make_face()
    fillet1_piece_18a = extrude(amount=6.601702270265445, mode=Mode.PRIVATE)
    fillet1_piece_18a = split(fillet1_piece_18a, bisect_by=Plane(origin=(-5.169208228517213, 2.781117736431367, 15.239999999999998), z_dir=(0, 0, -1)), keep=Keep.TOP, mode=Mode.PRIVATE)
    with BuildSketch(Plane(origin=(19.049999999999997, 0, 15.239999999999998), x_dir=(-1, 0, 0), z_dir=(0, -1, 0))) as fillet1_piece_18b_section:
        with BuildLine():
            CenterArc((24.130000000000003 + FILLET1_R, FILLET1_R), FILLET1_R, 180, 90.00000000000017)
            Line((24.130000000000003 + FILLET1_R, 0), (24.130000000000003, 0))
            Line((24.130000000000003, 0), (24.13, FILLET1_R))
        make_face()
    fillet1_piece_18b = revolve(axis=Axis((19.049999999999997, 0, 15.239999999999998), (0, 0, -1)), revolution_arc=13.581260422554424, mode=Mode.PRIVATE)
    fillet1_piece_18b = split(fillet1_piece_18b, bisect_by=Plane(origin=(-5.000706512259434, 2.5399999999999956, 14.955719927842757), z_dir=(8e-17, 1, 0)), keep=Keep.TOP, mode=Mode.PRIVATE)
    fillet1_piece_18 = fillet1_piece_18a & fillet1_piece_18b
    add(fillet1_piece_18)
    with BuildSketch(Plane(origin=(-4.945943407167807, -2.539999999999996, 10.159999999999997), x_dir=(0.12766405034714182, -0.9918174682112442, 0), z_dir=(0, 0, -1))) as fillet1_piece_19a_section:
        with BuildLine():
            CenterArc((1.1170481769540845, 1.2696769750168004), FILLET1_R, 187.33462748878583, 81.3730734414022)
            Line((-0.1425600076744228, 1.107543631077695), (0, 0))
            ThreePointArc((0, 0), (0.5442029580032722, 0.00613747468079426), (1.088405916006544, -2e-17))
        make_face()
    fillet1_piece_19a = extrude(amount=23.111702270265507, mode=Mode.PRIVATE)
    fillet1_piece_19a = split(fillet1_piece_19a, bisect_by=Plane(origin=(-5.169208228517128, -2.7811177364302493, -10.159999999999997), z_dir=(0, 0, -1)), keep=Keep.TOP, mode=Mode.PRIVATE)
    with BuildSketch(Plane(origin=(19.049999999999997, 0, -10.159999999999997), x_dir=(-0.9720378558927297, -0.23482420384505664, 0), z_dir=(0.23482420384505664, -0.9720378558927297, 0))) as fillet1_piece_19b_section:
        with BuildLine():
            CenterArc((24.129999999999995 + FILLET1_R, FILLET1_R), FILLET1_R, 180, 90)
            Line((24.129999999999995 + FILLET1_R, 0), (24.129999999999995, 0))
            Line((24.129999999999995, 0), (24.129999999999995, FILLET1_R))
        make_face()
    fillet1_piece_19b = revolve(axis=Axis((19.049999999999997, 0, -10.159999999999997), (0, 0, -1)), revolution_arc=13.581260422554445, mode=Mode.PRIVATE)
    fillet1_piece_19b = split(fillet1_piece_19b, bisect_by=Plane(origin=(-5.000706985946903, -2.539999999999996, -10.444279944253614), z_dir=(1.5e-16, -1, 0)), keep=Keep.TOP, mode=Mode.PRIVATE)
    fillet1_piece_19 = fillet1_piece_19a & fillet1_piece_19b
    add(fillet1_piece_19)
    with BuildSketch(Plane(origin=(-4.945943407167803, 2.5399999999999956, -12.448297729734556), x_dir=(-1, 0, 0), z_dir=(0, 0, -1))) as fillet1_piece_20a_section:
        with BuildLine():
            CenterArc((1.1166809081061828, 1.27), FILLET1_R, 188.62692655867798, 81.37307344132205)
            ThreePointArc((-0.13895030765742877, 1.0795000000000146), (-0.06338789923047727, 0.5405335348765479), (0, 0))
            Line((0, 0), (1.1166809081061828, 0))
        make_face()
    fillet1_piece_20a = extrude(amount=6.601702270265445, mode=Mode.PRIVATE)
    fillet1_piece_20a = split(fillet1_piece_20a, bisect_by=Plane(origin=(-5.169208228517213, 2.781117736431371, -15.239999999999998), z_dir=(0, 0, 1)), keep=Keep.TOP, mode=Mode.PRIVATE)
    with BuildSketch(Plane(origin=(19.049999999999997, 0, -15.239999999999998), x_dir=(-1, 0, 0), z_dir=(0, -1, 0))) as fillet1_piece_20b_section:
        with BuildLine():
            CenterArc((24.13 + FILLET1_R, -FILLET1_R), FILLET1_R, 90, 90)
            Line((24.13 + FILLET1_R, 0), (24.13, 0))
            Line((24.13, 0), (24.13, -FILLET1_R))
        make_face()
    fillet1_piece_20b = revolve(axis=Axis((19.049999999999997, 0, -15.239999999999998), (0, 0, -1)), revolution_arc=13.581260422554415, mode=Mode.PRIVATE)
    fillet1_piece_20b = split(fillet1_piece_20b, bisect_by=Plane(origin=(-5.000706512259434, 2.5399999999999956, -14.955719927842756), z_dir=(8e-17, 1, 0)), keep=Keep.TOP, mode=Mode.PRIVATE)
    fillet1_piece_20 = fillet1_piece_20a & fillet1_piece_20b
    add(fillet1_piece_20)
    with BuildSketch(Plane(origin=(-4.945943407167807, -2.539999999999996, 19.05), x_dir=(0.12766405034714182, -0.9918174682112442, 0), z_dir=(0, 0, -1))) as fillet1_piece_21a_section:
        with BuildLine():
            CenterArc((1.1170481769540845, 1.2696769750168004), FILLET1_R, 187.33462748878583, 81.3730734414022)
            Line((-0.1425600076744228, 1.107543631077695), (0, 0))
            ThreePointArc((0, 0), (0.5442029580032722, 0.00613747468079426), (1.088405916006544, -2e-17))
        make_face()
    fillet1_piece_21a = extrude(amount=6.601702270265513, mode=Mode.PRIVATE)
    fillet1_piece_21a = split(fillet1_piece_21a, bisect_by=Plane(origin=(-5.169208228517128, -2.7811177364302497, 15.239999999999998), z_dir=(0, 0, -1)), keep=Keep.TOP, mode=Mode.PRIVATE)
    with BuildSketch(Plane(origin=(19.049999999999997, 0, 15.239999999999998), x_dir=(-0.9720378558927298, -0.23482420384505664, 0), z_dir=(0.23482420384505664, -0.9720378558927298, 0))) as fillet1_piece_21b_section:
        with BuildLine():
            CenterArc((24.130000000000003 + FILLET1_R, FILLET1_R), FILLET1_R, 180, 90)
            Line((24.130000000000003 + FILLET1_R, 0), (24.130000000000003, 0))
            Line((24.130000000000003, 0), (24.130000000000003, FILLET1_R))
        make_face()
    fillet1_piece_21b = revolve(axis=Axis((19.049999999999997, 0, 15.239999999999998), (0, 0, -1)), revolution_arc=13.581260422554445, mode=Mode.PRIVATE)
    fillet1_piece_21b = split(fillet1_piece_21b, bisect_by=Plane(origin=(-5.00070698594691, -2.539999999999996, 14.955720055746385), z_dir=(1.5e-16, -1, 0)), keep=Keep.TOP, mode=Mode.PRIVATE)
    fillet1_piece_21 = fillet1_piece_21a & fillet1_piece_21b
    add(fillet1_piece_21)
    with BuildSketch(Plane(origin=(-4.945943407167803, 2.5399999999999956, 12.951702270265438), x_dir=(-1, 0, 0), z_dir=(0, 0, -1))) as fillet1_piece_22a_section:
        with BuildLine():
            CenterArc((1.1166809081061828, 1.27), FILLET1_R, 188.62692655867798, 81.37307344132205)
            ThreePointArc((-0.13895030765742877, 1.0795000000000146), (-0.06338789923047727, 0.5405335348765479), (0, 0))
            Line((0, 0), (1.1166809081061828, 0))
        make_face()
    fillet1_piece_22a = extrude(amount=23.111702270265432, mode=Mode.PRIVATE)
    fillet1_piece_22a = split(fillet1_piece_22a, bisect_by=Plane(origin=(-5.169208228517213, 2.7811177364313715, 10.159999999999995), z_dir=(0, 0, 1)), keep=Keep.TOP, mode=Mode.PRIVATE)
    with BuildSketch(Plane(origin=(19.049999999999997, 0, 10.159999999999997), x_dir=(-1, 0, 0), z_dir=(0, -1, 0))) as fillet1_piece_22b_section:
        with BuildLine():
            CenterArc((24.13 + FILLET1_R, -FILLET1_R), FILLET1_R, 90, 90)
            Line((24.13 + FILLET1_R, 0), (24.13, 0))
            Line((24.13, 0), (24.13, -FILLET1_R))
        make_face()
    fillet1_piece_22b = revolve(axis=Axis((19.049999999999997, 0, 10.159999999999997), (0, 0, -1)), revolution_arc=13.581260422554415, mode=Mode.PRIVATE)
    fillet1_piece_22b = split(fillet1_piece_22b, bisect_by=Plane(origin=(-5.000706512259434, 2.5399999999999956, 10.444280072157238), z_dir=(8e-17, 1, 0)), keep=Keep.TOP, mode=Mode.PRIVATE)
    fillet1_piece_22 = fillet1_piece_22a & fillet1_piece_22b
    add(fillet1_piece_22)
    with BuildSketch(Plane(origin=(-4.9459434071678094, 2.5399999999999956, 10.159999999999997), x_dir=(-1, 0, 0), z_dir=(0, 0, -1))) as fillet1_piece_23a_section:
        with BuildLine():
            CenterArc((1.1166809081061766, 1.27), FILLET1_R, 188.62692655867798, 81.37307344132205)
            ThreePointArc((-0.138950307657435, 1.0795000000000146), (-0.06338789923048704, 0.5405335348765443), (0, 0))
            Line((0, 0), (1.1166809081061766, 0))
        make_face()
    fillet1_piece_23a = extrude(amount=23.111702270265436, mode=Mode.PRIVATE)
    fillet1_piece_23a = split(fillet1_piece_23a, bisect_by=Plane(origin=(-5.169208228517217, 2.781117736431367, -10.159999999999997), z_dir=(0, 0, -1)), keep=Keep.TOP, mode=Mode.PRIVATE)
    with BuildSketch(Plane(origin=(19.049999999999997, 0, -10.159999999999997), x_dir=(-1, 0, 0), z_dir=(0, -1, 0))) as fillet1_piece_23b_section:
        with BuildLine():
            CenterArc((24.129999999999995 + FILLET1_R, FILLET1_R), FILLET1_R, 180, 89.99999999999983)
            Line((24.129999999999995 + FILLET1_R, 0), (24.129999999999995, 0))
            Line((24.129999999999995, 0), (24.13, FILLET1_R))
        make_face()
    fillet1_piece_23b = revolve(axis=Axis((19.049999999999997, 0, -10.159999999999997), (0, 0, -1)), revolution_arc=13.581260422554427, mode=Mode.PRIVATE)
    fillet1_piece_23b = split(fillet1_piece_23b, bisect_by=Plane(origin=(-5.000706512259427, 2.5399999999999956, -10.44428007215724), z_dir=(8e-17, 1, 0)), keep=Keep.TOP, mode=Mode.PRIVATE)
    fillet1_piece_23 = fillet1_piece_23a & fillet1_piece_23b
    add(fillet1_piece_23)
    with BuildSketch(Plane(origin=(-4.945943407167807, -2.539999999999996, -12.448297729734488), x_dir=(0.12766405034714182, -0.9918174682112442, 0), z_dir=(0, 0, -1))) as fillet1_piece_24a_section:
        with BuildLine():
            CenterArc((1.1170481769540845, 1.2696769750168004), FILLET1_R, 187.33462748878583, 81.3730734414022)
            Line((-0.1425600076744228, 1.107543631077695), (0, 0))
            ThreePointArc((0, 0), (0.5442029580032722, 0.00613747468079426), (1.088405916006544, -2e-17))
        make_face()
    fillet1_piece_24a = extrude(amount=6.601702270265513, mode=Mode.PRIVATE)
    fillet1_piece_24a = split(fillet1_piece_24a, bisect_by=Plane(origin=(-5.169208228517128, -2.7811177364302524, -15.239999999999998), z_dir=(0, 0, 1)), keep=Keep.TOP, mode=Mode.PRIVATE)
    with BuildSketch(Plane(origin=(19.049999999999997, 0, -15.239999999999998), x_dir=(-0.97203785589273, -0.23482420384505578, 0), z_dir=(0.23482420384505578, -0.97203785589273, 0))) as fillet1_piece_24b_section:
        with BuildLine():
            CenterArc((24.130000000000003 + FILLET1_R, -FILLET1_R), FILLET1_R, 90, 90)
            Line((24.130000000000003 + FILLET1_R, 0), (24.130000000000003, 0))
            Line((24.130000000000003, 0), (24.130000000000003, -FILLET1_R))
        make_face()
    fillet1_piece_24b = revolve(axis=Axis((19.049999999999997, 0, -15.239999999999998), (0, 0, -1)), revolution_arc=13.581260422554433, mode=Mode.PRIVATE)
    fillet1_piece_24b = split(fillet1_piece_24b, bisect_by=Plane(origin=(-5.000706985946908, -2.539999999999996, -14.955720055746387), z_dir=(1.5e-16, -1, 0)), keep=Keep.TOP, mode=Mode.PRIVATE)
    fillet1_piece_24 = fillet1_piece_24a & fillet1_piece_24b
    add(fillet1_piece_24)


solid = part.part
